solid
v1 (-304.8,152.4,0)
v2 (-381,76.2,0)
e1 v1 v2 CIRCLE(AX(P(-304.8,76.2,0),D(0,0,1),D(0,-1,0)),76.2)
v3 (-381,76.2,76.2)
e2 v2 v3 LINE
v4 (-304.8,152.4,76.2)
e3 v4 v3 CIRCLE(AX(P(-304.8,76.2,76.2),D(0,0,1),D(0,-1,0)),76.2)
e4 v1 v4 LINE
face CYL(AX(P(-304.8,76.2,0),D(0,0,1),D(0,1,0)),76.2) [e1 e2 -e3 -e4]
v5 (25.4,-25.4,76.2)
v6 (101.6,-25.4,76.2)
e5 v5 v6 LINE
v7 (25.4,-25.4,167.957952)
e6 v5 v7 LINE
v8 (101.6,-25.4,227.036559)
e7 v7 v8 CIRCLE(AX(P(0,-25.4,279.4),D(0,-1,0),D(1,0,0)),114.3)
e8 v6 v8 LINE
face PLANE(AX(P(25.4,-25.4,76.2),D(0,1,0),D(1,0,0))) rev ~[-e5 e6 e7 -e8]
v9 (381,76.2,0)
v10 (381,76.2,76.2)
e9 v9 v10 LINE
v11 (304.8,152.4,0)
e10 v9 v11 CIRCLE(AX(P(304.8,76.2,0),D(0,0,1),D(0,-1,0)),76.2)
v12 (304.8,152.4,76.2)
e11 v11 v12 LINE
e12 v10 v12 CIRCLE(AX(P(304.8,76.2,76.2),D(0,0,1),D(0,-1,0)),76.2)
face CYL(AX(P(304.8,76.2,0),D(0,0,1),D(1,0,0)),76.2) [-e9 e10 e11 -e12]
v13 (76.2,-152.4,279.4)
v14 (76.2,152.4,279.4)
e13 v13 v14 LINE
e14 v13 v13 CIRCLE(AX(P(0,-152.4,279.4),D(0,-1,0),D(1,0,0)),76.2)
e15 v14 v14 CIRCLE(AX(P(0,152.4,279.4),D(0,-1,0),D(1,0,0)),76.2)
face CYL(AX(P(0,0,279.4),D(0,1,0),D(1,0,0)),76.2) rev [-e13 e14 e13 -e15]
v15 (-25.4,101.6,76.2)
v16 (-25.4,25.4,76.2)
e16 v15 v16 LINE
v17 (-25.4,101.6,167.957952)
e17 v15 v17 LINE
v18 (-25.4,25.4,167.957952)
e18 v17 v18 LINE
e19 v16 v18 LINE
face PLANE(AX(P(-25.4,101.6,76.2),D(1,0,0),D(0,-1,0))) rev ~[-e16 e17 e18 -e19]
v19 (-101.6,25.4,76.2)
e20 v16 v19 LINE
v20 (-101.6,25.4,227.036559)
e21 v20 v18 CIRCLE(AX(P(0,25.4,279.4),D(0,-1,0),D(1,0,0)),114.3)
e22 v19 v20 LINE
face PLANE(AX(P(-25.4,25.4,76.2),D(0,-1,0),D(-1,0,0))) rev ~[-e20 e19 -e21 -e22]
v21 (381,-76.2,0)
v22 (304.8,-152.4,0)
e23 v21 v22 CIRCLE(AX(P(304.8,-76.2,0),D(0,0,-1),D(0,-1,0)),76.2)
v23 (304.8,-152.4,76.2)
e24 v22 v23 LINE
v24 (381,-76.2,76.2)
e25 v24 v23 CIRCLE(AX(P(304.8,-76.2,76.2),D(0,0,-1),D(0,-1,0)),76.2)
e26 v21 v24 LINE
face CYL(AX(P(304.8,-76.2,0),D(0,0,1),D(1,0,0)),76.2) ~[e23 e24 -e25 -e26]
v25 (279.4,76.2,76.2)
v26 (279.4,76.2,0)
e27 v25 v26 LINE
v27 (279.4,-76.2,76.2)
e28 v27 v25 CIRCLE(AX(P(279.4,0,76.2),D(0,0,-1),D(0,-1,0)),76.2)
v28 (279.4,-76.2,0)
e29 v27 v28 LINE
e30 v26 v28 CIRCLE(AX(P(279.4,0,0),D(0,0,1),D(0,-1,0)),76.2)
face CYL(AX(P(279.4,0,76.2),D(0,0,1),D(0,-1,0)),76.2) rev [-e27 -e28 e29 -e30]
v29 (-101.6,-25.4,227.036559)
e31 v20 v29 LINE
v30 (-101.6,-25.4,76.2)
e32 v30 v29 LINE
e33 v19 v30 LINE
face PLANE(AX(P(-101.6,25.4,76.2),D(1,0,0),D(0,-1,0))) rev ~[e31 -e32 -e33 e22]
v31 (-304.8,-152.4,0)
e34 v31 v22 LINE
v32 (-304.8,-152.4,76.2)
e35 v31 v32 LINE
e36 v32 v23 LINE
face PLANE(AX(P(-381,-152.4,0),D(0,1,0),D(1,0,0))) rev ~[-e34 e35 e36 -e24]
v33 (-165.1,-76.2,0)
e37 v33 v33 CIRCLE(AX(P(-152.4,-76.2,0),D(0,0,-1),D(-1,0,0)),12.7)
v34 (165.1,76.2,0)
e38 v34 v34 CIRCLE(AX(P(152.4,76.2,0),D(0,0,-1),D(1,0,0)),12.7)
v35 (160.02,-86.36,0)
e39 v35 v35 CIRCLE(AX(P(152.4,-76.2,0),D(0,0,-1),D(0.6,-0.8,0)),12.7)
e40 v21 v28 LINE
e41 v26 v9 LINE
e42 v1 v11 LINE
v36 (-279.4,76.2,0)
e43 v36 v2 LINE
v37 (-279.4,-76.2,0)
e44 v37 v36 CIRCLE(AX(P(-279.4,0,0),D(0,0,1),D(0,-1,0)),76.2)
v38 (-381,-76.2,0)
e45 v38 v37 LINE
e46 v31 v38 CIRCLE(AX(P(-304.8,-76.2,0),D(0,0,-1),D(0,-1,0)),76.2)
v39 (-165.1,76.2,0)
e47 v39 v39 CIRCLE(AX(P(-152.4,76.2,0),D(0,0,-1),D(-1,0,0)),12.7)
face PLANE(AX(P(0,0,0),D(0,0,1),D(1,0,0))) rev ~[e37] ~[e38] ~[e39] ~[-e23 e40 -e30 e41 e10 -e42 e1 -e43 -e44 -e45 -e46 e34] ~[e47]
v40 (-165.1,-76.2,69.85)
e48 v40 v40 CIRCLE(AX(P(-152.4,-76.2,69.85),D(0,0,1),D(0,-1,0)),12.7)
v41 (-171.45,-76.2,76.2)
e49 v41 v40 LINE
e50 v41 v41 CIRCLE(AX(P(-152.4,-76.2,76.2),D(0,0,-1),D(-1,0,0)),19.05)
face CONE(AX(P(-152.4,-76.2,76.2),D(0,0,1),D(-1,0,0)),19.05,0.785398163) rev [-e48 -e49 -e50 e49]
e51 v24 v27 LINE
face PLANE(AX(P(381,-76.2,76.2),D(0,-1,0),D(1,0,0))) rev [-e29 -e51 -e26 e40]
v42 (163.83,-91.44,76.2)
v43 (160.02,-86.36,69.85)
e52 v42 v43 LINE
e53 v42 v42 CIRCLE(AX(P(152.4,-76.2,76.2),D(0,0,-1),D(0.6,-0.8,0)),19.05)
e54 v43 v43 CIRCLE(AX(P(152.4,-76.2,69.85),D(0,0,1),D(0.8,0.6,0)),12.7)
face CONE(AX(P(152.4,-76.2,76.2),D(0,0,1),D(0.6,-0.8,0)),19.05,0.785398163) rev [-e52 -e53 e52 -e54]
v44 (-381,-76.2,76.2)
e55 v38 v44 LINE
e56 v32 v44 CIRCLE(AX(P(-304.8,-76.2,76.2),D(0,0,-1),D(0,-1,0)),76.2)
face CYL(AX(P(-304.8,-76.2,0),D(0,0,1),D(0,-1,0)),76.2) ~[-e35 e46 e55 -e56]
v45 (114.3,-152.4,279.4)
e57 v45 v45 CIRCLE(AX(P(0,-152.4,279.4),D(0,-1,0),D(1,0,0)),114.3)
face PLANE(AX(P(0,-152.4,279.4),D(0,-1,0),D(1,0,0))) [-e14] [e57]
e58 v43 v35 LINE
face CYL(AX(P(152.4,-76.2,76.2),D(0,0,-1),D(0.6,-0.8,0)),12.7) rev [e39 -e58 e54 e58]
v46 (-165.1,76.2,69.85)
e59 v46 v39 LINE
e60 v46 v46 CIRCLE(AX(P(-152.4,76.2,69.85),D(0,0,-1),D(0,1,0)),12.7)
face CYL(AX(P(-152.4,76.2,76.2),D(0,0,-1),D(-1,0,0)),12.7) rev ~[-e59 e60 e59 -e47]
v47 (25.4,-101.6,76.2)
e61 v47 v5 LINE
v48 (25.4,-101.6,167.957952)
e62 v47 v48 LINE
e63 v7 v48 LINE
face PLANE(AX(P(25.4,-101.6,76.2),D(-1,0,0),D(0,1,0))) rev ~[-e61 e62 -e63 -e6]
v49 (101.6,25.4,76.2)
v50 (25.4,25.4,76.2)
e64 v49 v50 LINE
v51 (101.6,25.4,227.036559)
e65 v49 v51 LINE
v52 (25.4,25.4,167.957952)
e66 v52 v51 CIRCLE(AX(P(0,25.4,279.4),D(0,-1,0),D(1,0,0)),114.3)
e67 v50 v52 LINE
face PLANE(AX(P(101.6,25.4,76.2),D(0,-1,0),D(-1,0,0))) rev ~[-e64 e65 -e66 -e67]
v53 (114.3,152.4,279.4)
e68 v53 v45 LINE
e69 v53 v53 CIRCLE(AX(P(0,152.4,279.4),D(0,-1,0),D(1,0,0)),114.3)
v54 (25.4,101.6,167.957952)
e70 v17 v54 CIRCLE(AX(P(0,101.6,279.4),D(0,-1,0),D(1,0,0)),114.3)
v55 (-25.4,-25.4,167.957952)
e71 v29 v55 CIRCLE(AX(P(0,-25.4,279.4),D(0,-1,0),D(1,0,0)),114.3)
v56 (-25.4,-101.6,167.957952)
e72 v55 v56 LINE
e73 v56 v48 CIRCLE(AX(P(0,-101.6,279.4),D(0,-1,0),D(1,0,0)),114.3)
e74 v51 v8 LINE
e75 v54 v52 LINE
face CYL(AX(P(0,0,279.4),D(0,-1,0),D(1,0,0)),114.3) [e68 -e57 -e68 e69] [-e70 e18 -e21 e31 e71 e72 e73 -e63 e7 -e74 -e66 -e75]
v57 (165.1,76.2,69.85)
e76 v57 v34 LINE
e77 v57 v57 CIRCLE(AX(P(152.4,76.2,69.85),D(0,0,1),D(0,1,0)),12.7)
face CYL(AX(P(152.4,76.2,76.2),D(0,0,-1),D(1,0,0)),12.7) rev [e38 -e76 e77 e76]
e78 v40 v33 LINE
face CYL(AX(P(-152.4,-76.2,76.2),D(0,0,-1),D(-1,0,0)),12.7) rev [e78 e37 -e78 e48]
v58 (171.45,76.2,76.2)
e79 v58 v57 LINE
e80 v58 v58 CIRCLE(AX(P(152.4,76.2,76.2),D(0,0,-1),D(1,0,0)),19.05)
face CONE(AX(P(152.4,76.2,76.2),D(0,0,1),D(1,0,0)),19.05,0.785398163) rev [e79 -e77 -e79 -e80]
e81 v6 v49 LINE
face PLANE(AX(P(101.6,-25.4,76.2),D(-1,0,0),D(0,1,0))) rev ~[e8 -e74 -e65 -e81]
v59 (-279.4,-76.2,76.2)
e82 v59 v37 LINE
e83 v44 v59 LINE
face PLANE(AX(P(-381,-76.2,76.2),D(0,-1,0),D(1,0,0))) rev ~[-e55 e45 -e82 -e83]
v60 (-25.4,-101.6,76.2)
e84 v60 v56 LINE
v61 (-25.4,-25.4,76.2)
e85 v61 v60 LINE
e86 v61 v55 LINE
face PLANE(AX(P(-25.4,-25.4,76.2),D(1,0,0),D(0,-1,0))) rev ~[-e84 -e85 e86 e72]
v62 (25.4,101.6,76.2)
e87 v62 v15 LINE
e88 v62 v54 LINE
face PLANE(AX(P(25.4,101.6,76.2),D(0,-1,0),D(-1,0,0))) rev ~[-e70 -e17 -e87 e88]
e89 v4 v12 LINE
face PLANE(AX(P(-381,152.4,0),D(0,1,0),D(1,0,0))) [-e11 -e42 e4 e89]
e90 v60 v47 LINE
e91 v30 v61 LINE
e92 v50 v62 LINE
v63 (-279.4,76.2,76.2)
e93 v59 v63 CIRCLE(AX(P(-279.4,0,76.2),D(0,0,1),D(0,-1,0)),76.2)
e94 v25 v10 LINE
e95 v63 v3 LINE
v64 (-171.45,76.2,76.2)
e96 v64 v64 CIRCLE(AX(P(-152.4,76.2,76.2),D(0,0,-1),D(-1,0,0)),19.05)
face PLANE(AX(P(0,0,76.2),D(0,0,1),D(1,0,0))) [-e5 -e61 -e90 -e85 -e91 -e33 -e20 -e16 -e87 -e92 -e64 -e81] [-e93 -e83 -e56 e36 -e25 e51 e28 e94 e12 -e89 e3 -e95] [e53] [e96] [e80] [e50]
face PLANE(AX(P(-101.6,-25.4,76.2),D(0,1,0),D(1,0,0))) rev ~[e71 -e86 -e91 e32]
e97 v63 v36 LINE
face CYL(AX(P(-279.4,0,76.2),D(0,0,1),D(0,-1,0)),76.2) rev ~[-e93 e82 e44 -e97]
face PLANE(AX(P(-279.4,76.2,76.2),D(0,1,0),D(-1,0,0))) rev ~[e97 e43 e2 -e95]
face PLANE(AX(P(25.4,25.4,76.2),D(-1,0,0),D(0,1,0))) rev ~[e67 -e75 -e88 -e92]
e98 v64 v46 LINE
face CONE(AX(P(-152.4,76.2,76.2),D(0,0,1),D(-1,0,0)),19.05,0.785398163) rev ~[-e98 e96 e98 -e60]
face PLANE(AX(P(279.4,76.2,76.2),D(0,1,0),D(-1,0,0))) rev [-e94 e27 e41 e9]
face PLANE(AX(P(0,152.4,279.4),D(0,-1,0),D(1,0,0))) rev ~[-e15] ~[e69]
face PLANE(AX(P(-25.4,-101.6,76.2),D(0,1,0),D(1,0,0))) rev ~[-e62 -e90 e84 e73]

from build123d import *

# Parameters (mm, degrees)
F0_W            = 762
F0_H            = 304.8
F1_DEPTH        = 76.2
F3_DEPTH        = 203.2
F4_R            = 114.3
F4_R_2          = 76.2
F5_DEPTH        = 152.4
F6_DEPTH        = 152.4
F8_R            = 76.2
F10_DEPTH       = 76.201
F11_D           = 25.4
F11_CSINK_D     = 38.1
F11_CSINK_ANGLE = 90


# Not quite as in the source:
# - a pattern or mirror of a feature is missing from the dataset's text; its kind, count and spacing are read off the source's solid


with BuildPart() as f1:
    # F0 (on Top) → F1 (new body)
    with BuildSketch(Plane.XY):
        Rectangle(F0_W, F0_H)
    extrude(amount=F1_DEPTH)

    # F2 (on face) → F3 (join)
    with BuildSketch(Plane.XY.offset(76.2)):
        Polygon((101.6, -25.4), (101.6, 25.4), (25.4, 25.4), (25.4, 101.6), (-25.4, 101.6), (-25.4, 25.4), (-101.6, 25.4), (-101.6, -25.4), (-25.4, -25.4), (-25.4, -101.6), (25.4, -101.6), (25.4, -25.4), align=None)
    extrude(amount=F3_DEPTH)

    # F4 (on Front) → F5 (join, symmetric)
    with BuildSketch(Plane.XZ):
        with Locations((0, 279.4)):
            Circle(F4_R)
        with Locations((0, 279.4)):
            Circle(F4_R_2, mode=Mode.SUBTRACT)
    extrude(amount=F5_DEPTH, both=True)

    # F4 (on Front) → F6 (cut, symmetric)
    with BuildSketch(Plane.XZ):
        with Locations((0, 279.4)):
            Circle(F4_R_2)
    extrude(amount=F6_DEPTH, both=True, mode=Mode.SUBTRACT)

    # F8
    f8_edges = [f1.edges().sort_by_distance(p)[0] for p in [
        (381, 152.4, 38.1),
        (-381, 152.4, 38.1),
        (381, -152.4, 38.1),
        (-381, -152.4, 38.1),
    ]]
    fillet(f8_edges, radius=F8_R)

    # F9 (on face) → F10 (cut, through all)
    with BuildSketch(Plane.XY.offset(76.2)):
        with BuildLine():
            Line((-381, -76.2), (-279.4, -76.2))
            ThreePointArc((-279.4, -76.2), (-203.2, 0), (-279.4, 76.2))
            Line((-279.4, 76.2), (-381, 76.2))
            Line((-381, 76.2), (-381, -76.2))
        make_face()
    f10 = extrude(amount=-F10_DEPTH, mode=Mode.SUBTRACT)

    # F10_copies: F10 across plane
    add(f10.mirror(Plane(origin=(0, 0, 0), x_dir=(0, 0, 1), z_dir=(1, 0, 0))), mode=Mode.SUBTRACT)

    # F11 (through all)
    with Locations(Plane.XY.offset(76.2)):
        with Locations((-152.4, 76.2)):
            f11 = CounterSinkHole(F11_D / 2, F11_CSINK_D / 2, counter_sink_angle=F11_CSINK_ANGLE)

    # F11_copies: F11 across plane
    add(f11.mirror(Plane(origin=(0, 0, 0), x_dir=(0, 0, -1), z_dir=(0, -1, 0))), mode=Mode.SUBTRACT)

    # F11_copies1: F11 across plane
    add(f11.mirror(Plane(origin=(0, 0, 0), x_dir=(0, 0, 1), z_dir=(1, 0, 0))), mode=Mode.SUBTRACT)

    # F11_copies2: F11 across plane
    add(f11.mirror(Plane(origin=(0, 0, 0), x_dir=(0.4472135955, 0.894427191, 0), z_dir=(0.894427191, -0.4472135955, 0))), mode=Mode.SUBTRACT)


solid = f1.part
